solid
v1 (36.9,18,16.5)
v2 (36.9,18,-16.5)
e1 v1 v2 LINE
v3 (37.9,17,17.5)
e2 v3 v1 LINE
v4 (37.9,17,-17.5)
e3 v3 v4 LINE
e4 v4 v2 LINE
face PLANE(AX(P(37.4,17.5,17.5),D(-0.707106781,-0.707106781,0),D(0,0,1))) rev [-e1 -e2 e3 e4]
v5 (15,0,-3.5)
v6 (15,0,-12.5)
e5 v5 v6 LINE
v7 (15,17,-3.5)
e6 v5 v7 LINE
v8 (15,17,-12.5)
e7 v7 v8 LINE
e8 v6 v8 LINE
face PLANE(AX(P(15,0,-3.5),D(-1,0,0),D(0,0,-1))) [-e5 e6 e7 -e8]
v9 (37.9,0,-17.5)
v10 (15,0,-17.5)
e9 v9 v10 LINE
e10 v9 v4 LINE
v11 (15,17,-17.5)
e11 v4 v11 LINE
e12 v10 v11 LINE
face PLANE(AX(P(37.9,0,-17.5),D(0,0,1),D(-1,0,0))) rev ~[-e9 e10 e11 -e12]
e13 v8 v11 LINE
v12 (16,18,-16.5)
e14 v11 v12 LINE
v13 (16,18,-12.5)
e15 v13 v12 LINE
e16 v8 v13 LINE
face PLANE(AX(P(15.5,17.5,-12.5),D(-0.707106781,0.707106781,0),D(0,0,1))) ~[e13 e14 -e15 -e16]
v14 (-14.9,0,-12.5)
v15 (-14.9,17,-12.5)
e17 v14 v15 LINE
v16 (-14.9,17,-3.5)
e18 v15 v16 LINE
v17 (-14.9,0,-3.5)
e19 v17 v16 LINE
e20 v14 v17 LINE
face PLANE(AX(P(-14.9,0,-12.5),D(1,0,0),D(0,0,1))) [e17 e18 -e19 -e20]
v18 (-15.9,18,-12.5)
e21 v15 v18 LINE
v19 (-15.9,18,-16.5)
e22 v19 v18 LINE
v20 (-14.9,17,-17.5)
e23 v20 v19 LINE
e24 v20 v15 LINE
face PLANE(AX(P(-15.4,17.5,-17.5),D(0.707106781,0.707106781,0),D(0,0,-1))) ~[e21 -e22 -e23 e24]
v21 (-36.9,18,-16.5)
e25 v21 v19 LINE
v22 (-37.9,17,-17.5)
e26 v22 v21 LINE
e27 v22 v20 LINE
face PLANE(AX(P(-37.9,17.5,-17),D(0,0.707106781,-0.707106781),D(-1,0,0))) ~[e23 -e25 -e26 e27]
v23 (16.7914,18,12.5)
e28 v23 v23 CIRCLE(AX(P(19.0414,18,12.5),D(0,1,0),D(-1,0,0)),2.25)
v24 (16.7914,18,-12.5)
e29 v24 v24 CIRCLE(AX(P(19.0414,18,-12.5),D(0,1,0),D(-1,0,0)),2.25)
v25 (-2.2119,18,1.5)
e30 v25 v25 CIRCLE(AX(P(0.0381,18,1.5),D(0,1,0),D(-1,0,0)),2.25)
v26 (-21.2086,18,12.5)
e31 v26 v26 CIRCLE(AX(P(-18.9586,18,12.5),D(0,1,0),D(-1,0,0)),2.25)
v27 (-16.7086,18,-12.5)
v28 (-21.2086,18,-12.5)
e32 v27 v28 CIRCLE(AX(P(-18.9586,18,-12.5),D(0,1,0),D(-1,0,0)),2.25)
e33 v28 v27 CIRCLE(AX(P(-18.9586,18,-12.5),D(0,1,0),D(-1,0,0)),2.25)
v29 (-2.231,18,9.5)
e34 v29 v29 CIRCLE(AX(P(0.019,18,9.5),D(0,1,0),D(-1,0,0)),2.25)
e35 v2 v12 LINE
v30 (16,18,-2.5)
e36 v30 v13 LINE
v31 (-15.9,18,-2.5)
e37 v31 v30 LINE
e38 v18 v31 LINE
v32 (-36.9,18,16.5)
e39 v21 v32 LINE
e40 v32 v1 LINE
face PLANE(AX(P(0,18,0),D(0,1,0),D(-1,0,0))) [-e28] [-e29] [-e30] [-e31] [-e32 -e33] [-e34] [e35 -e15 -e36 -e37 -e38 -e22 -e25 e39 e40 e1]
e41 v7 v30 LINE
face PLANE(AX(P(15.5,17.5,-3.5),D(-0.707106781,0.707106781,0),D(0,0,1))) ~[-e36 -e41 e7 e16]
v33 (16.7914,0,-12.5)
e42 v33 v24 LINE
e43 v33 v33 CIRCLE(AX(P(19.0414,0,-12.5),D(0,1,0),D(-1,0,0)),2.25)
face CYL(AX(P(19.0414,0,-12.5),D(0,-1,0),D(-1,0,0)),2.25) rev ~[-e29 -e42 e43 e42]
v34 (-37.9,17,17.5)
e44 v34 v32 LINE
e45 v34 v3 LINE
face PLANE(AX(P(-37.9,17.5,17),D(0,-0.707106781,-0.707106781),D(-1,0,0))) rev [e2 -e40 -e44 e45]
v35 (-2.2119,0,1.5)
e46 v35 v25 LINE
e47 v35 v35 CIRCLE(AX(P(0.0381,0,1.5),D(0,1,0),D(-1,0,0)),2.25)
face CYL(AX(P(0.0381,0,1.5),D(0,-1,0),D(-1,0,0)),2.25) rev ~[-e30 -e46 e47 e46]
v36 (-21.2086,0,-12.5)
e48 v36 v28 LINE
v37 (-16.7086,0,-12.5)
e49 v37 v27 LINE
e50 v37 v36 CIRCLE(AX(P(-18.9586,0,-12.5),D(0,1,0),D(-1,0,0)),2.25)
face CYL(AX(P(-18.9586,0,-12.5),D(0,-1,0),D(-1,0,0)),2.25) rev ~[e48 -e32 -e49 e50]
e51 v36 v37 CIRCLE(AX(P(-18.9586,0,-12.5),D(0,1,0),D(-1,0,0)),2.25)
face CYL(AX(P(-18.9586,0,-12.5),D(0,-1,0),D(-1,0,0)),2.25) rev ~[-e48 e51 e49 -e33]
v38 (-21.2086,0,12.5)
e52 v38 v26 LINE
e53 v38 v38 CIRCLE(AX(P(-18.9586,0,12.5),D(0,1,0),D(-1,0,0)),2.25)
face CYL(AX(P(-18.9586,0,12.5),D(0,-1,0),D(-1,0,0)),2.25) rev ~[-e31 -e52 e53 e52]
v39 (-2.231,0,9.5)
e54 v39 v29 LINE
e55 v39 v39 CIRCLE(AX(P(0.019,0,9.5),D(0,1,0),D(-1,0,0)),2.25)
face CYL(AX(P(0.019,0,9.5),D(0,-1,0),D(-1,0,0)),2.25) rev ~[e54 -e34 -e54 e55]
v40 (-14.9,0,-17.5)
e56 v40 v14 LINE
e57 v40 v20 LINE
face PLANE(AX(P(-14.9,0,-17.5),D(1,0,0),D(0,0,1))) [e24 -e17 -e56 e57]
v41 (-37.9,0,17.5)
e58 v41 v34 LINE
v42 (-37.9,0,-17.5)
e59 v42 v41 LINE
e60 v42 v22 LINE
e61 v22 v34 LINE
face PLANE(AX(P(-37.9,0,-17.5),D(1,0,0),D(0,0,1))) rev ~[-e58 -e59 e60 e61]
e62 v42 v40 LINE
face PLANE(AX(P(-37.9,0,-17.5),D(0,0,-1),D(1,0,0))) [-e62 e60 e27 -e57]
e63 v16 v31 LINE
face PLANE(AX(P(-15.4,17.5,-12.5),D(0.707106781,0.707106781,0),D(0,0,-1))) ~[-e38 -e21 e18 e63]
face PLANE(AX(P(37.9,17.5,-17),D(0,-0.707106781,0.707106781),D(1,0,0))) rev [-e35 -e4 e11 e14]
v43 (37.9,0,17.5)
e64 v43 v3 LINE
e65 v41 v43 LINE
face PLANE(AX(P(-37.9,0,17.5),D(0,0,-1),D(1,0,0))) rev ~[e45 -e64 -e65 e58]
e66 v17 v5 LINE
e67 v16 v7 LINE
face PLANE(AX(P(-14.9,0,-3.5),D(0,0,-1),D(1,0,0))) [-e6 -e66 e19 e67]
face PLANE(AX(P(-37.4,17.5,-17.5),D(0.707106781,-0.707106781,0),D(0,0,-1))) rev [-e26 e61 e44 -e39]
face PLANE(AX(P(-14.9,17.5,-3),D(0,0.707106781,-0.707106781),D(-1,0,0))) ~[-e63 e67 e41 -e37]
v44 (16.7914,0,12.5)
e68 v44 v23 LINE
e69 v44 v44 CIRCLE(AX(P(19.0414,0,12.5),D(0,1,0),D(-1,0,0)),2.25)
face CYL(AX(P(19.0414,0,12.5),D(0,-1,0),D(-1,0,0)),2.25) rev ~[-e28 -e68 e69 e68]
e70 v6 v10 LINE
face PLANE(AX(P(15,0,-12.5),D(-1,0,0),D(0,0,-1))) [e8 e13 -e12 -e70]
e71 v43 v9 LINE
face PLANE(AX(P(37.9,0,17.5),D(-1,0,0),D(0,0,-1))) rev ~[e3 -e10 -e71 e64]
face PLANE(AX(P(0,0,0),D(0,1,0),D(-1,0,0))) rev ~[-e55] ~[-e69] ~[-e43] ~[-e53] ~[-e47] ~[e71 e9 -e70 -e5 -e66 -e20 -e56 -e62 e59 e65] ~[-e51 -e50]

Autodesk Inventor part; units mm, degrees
ref_plane "YZ Plane" through (0, 0, 0) normal (1, 0, 0) x (0, 1, 0)
ref_plane "XZ Plane" through (0, 0, 0) normal (0, 1, 0) x (-1, 0, 0)
ref_plane "XY Plane" through (0, 0, 0) normal (0, 0, 1) x (1, 0, 0)
sketch "Sketch1" plane through (0, 0, 0) normal (0, 1, 0) x (-1, 0, 0)
  line L0 (37.9, -17.5) -> (37.9, 17.5)
  line L1 (37.9, 17.5) -> (-37.9, 17.5)
  line L2 (-37.9, 17.5) -> (-37.9, -17.5)
  line L3 (37.9, -17.5) -> (14.9, -17.5)
  line L4 (14.9, -17.5) -> (14.9, -3.5)
  line L5 (14.9, -3.5) -> (-15, -3.5)
  line L6 (-15, -3.5) -> (-15, -17.5)
  line L7 (-37.9, -17.5) -> (-15, -17.5)
  line L8 (14.9, -17.5) -> (37.9, -17.5)
  circle A0 centre (-0.019, 9.5) radius 2.25
  circle A1 centre (-0.0381, 1.5) radius 2.25
  circle A2 centre (18.9586, -12.5) radius 2.25
  circle A3 centre (-19.0414, -12.5) radius 2.25
  circle A4 centre (-19.0414, 12.5) radius 2.25
  circle A5 centre (18.9586, 12.5) radius 2.25
  line L9 (18.9586, -12.5) -> (-19.0414, -12.5)
  line L10 (5.1, -12.5) -> (-13.9, -12.5)
  point P0 (0, 0)
  dimension "d0" = 75.8
  dimension "d1" = 35
  dimension "d2" = 23
  dimension "d3" = 14
  dimension "d4" = 29.9
  dimension "d7" = 4.5
  dimension "d8" = 4.5
  dimension "d11" = 4.5
  dimension "d12" = 4.5
  dimension "d20" = 38
  dimension "d21" = 0
  dimension "d23" = 38
extrude "Extrusion1" add sketch "Sketch1" along normal blind 18 contours L3 L4 L5 L6 L7 L2 L1 L0
chamfer "Chamfer1" distance 1 angle 45 8 edges at (-37.9, 18, 0) (0, 18, 17.5) (37.9, 18, 0) (-26.4, 18, -17.5) (26.45, 18, -17.5) (-14.9, 18, -10.5) (0.05, 18, -3.5) (15, 18, -10.5)
properties part number "GROUNDPLATE PART 1" material "Steel ASTM A36"
